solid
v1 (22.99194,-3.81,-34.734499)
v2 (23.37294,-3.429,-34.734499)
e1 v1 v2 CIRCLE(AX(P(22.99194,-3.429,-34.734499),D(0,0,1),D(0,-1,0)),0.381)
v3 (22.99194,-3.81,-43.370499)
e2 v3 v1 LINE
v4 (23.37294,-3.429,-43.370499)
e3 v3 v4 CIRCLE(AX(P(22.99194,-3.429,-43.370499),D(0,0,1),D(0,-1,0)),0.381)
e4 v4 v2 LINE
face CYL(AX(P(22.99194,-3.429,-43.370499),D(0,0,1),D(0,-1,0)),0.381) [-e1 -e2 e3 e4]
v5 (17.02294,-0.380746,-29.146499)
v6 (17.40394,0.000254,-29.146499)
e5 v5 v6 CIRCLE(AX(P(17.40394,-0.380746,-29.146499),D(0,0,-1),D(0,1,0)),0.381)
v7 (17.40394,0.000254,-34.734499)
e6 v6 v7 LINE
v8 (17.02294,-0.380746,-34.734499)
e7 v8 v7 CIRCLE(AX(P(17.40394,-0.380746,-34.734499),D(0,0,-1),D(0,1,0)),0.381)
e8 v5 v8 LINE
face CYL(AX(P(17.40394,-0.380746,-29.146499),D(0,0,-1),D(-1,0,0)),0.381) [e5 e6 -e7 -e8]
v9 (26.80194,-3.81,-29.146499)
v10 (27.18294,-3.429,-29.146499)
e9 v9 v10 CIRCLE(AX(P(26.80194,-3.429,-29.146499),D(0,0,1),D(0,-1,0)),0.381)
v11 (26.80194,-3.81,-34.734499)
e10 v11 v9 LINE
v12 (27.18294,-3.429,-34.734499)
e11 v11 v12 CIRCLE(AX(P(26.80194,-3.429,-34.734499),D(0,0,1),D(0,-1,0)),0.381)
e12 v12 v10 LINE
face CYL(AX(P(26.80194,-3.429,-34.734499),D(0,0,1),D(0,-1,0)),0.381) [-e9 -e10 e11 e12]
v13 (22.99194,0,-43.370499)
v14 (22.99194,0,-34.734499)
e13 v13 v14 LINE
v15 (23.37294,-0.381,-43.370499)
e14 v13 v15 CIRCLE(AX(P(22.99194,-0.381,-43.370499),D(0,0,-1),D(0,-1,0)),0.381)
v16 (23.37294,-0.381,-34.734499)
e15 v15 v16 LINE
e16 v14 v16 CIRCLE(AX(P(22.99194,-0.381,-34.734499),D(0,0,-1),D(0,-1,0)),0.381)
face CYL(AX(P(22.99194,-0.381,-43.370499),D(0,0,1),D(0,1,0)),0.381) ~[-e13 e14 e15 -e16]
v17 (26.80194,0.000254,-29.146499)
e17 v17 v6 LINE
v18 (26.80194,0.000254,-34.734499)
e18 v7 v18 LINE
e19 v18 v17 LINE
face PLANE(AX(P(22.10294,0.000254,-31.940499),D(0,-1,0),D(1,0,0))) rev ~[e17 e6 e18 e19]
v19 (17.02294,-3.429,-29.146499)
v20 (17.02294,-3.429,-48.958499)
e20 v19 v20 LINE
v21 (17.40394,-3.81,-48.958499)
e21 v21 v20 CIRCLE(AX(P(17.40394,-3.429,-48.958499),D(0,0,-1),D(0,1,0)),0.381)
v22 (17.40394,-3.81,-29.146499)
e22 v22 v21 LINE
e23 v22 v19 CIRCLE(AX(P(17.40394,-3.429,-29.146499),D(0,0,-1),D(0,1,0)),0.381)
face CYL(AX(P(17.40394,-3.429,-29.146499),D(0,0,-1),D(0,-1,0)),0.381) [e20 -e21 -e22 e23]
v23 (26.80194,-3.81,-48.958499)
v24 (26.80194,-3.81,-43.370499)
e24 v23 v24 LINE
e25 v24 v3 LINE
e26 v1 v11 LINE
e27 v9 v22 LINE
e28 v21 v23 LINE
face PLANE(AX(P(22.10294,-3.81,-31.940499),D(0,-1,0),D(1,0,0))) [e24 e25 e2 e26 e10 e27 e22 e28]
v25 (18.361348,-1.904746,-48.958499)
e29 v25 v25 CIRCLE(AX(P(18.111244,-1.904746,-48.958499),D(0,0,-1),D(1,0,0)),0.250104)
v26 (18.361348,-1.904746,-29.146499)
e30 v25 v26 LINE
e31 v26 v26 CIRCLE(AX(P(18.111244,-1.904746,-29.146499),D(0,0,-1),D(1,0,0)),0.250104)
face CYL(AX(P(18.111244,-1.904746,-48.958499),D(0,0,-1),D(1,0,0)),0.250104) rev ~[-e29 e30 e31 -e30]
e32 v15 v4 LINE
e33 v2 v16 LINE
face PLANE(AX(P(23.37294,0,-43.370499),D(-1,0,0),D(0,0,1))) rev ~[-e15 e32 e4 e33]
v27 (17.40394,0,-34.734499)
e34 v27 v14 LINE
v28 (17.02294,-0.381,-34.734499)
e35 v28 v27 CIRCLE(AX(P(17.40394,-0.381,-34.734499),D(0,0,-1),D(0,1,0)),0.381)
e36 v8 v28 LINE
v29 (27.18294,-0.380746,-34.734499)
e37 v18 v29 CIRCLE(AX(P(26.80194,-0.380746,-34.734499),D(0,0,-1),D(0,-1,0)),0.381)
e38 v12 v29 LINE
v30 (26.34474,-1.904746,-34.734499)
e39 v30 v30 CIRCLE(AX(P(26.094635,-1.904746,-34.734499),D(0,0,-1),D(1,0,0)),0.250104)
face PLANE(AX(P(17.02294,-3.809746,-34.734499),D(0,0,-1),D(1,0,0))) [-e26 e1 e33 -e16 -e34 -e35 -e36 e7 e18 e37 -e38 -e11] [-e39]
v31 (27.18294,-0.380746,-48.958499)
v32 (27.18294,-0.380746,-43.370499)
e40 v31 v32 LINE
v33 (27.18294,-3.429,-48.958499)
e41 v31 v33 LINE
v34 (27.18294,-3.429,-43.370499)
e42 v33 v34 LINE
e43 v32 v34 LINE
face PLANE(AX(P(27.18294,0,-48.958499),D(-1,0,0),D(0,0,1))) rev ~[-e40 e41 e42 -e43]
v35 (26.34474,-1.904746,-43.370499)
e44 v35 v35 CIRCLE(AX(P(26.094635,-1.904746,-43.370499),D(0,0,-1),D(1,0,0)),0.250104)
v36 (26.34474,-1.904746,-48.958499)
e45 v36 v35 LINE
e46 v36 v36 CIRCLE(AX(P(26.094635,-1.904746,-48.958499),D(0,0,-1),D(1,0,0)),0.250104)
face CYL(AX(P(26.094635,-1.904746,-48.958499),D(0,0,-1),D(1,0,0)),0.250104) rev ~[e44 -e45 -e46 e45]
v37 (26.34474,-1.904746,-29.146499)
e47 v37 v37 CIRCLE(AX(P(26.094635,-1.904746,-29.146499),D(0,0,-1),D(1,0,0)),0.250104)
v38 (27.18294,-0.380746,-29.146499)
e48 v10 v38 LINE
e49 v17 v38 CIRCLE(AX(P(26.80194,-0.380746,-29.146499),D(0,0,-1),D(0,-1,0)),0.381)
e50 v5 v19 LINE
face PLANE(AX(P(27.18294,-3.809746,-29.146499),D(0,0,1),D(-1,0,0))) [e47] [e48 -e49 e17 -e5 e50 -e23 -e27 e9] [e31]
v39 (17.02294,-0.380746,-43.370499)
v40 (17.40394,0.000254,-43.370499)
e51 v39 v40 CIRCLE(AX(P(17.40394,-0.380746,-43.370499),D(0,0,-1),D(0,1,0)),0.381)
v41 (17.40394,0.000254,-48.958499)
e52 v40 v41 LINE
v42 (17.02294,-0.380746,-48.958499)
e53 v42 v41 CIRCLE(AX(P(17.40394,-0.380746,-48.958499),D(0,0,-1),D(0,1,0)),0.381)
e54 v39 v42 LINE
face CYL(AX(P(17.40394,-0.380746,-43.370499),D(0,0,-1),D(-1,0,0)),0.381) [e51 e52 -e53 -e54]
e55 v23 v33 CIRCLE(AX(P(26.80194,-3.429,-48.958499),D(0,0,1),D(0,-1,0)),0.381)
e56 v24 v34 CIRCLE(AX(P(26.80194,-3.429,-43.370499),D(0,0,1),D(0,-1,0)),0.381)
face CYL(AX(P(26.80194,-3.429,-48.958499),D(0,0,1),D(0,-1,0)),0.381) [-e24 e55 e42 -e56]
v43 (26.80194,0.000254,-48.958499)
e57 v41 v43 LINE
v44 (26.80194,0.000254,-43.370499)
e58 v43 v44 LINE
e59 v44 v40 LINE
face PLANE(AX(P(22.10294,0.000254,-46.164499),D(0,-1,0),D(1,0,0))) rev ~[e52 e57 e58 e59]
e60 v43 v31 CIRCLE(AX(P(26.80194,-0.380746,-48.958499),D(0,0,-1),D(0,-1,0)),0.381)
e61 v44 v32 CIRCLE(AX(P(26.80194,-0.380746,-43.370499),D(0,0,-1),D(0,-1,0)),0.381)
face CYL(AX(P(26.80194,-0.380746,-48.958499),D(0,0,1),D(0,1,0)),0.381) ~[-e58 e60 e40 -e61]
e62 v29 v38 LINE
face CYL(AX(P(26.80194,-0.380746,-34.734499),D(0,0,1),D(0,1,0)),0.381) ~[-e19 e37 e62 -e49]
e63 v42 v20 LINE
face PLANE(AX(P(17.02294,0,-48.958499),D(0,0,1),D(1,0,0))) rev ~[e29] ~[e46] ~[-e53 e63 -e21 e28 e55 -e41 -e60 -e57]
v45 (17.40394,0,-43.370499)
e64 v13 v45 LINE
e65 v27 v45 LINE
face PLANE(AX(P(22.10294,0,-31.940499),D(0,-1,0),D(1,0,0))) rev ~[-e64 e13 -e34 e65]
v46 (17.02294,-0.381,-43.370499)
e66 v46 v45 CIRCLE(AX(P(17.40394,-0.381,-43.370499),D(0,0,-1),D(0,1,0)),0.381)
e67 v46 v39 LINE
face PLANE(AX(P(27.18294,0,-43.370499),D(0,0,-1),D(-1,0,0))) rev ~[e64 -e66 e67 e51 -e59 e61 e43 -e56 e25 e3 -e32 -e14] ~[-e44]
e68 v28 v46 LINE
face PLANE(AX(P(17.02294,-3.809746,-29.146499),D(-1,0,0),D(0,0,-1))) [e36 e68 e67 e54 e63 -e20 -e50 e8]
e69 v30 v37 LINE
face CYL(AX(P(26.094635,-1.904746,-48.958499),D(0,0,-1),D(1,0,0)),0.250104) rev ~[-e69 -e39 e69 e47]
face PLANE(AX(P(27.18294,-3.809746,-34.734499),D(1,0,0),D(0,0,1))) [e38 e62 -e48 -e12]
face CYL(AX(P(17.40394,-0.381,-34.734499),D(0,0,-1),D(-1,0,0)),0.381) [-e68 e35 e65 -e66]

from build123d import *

# Parameters (mm, degrees)
F0_W     = 6.35
F0_H     = 8.636
F1_DEPTH = 3.81
F3_START = -0.000254
F3_DEPTH = 3.81
F4_R     = 0.2501042953
F5_DEPTH = 50.8
F6_R     = 0.381


# Not quite as in the source:
# - a feature names something its author has since deleted; it is built from what else it names


with BuildPart() as f1:
    # F0 (on Front) → F1 (new body)
    with BuildSketch(Plane.XZ):
        Polygon((27.1829397243, -29.1464989846), (17.0229397243, -29.1464989846), (17.0229397243, -34.7344989846), (23.3729397243, -34.7344989846), (27.1829397243, -34.7344989846), align=None)
        with Locations((20.1979397243, -39.0524989846)):
            Rectangle(F0_W, F0_H)
        Polygon((23.3729397243, -43.3704989846), (17.0229397243, -43.3704989846), (17.0229397243, -48.9584989846), (23.3729397243, -48.9584989846), (27.1829397243, -48.9584989846), (27.1829397243, -43.3704989846), align=None)
    extrude(amount=F1_DEPTH)

    # F2 (on face) → F3 (join)
    with BuildSketch(Plane.XZ.offset(3.81).offset(F3_START)):
        Polygon((27.1829397243, -29.1464989846), (17.0229397243, -29.1464989846), (17.0229397243, -34.7344989846), (23.3729397243, -34.7344989846), (27.1829397243, -34.7344989846), align=None)
        Polygon((27.1829397243, -43.3704989846), (23.3729397243, -43.3704989846), (17.0229397243, -43.3704989846), (17.0229397243, -48.9584989846), (27.1829397243, -48.9584989846), align=None)
    extrude(amount=-F3_DEPTH)

    # F4 (on face) → F5 (cut)
    with BuildSketch(Plane(origin=(0, 0, -48.9584989846), x_dir=(1, 0, 0), z_dir=(0, 0, -1))):
        with Locations((26.094635429, 1.904746)):
            Circle(F4_R)
        with Locations((18.1112440196, 1.904746)):
            Circle(F4_R)
    extrude(amount=-F5_DEPTH, mode=Mode.SUBTRACT)

    # F6 (call 1 of 10: OpenCascade refuses the feature's edges together)
    f6_edges = [f1.edges().sort_by_distance(p)[0] for p in [
        (27.18294, -3.81, -31.940499),
    ]]
    fillet(f6_edges, radius=F6_R)

    # F6#2 (call 2 of 10)
    f6_2_edges = [f1.edges().sort_by_distance(p)[0] for p in [
        (17.02294, -3.81, -39.052499),
    ]]
    fillet(f6_2_edges, radius=F6_R)

    # F6#3 (call 3 of 10)
    f6_3_edges = [f1.edges().sort_by_distance(p)[0] for p in [
        (27.18294, -3.81, -46.164499),
    ]]
    fillet(f6_3_edges, radius=F6_R)

    # F6#4 (call 4 of 10)
    f6_4_edges = [f1.edges().sort_by_distance(p)[0] for p in [
        (23.37294, -3.81, -39.052499),
    ]]
    fillet(f6_4_edges, radius=F6_R)

    # F6#5 (call 5 of 10)
    f6_5_edges = [f1.edges().sort_by_distance(p)[0] for p in [
        (23.37294, 0, -39.052499),
    ]]
    fillet(f6_5_edges, radius=F6_R)

    # F6#7 (call 6 of 10)
    f6_7_edges = [f1.edges().sort_by_distance(p)[0] for p in [
        (27.18294, 0.000254, -31.940499),
    ]]
    fillet(f6_7_edges, radius=F6_R)

    # F6#8 (call 7 of 10)
    f6_8_edges = [f1.edges().sort_by_distance(p)[0] for p in [
        (27.18294, 0.000254, -46.164499),
    ]]
    fillet(f6_8_edges, radius=F6_R)

    # F6#10 (call 8 of 10)
    f6_10_edges = [f1.edges().sort_by_distance(p)[0] for p in [
        (17.02294, 0, -39.052499),
    ]]
    fillet(f6_10_edges, radius=F6_R)

    # F6#6 (call 9 of 10)
    f6_6_edges = [f1.edges().sort_by_distance(p)[0] for p in [
        (17.02294, 0.000254, -31.940499),
    ]]
    fillet(f6_6_edges, radius=F6_R)

    # F6#9 (call 10 of 10)
    f6_9_edges = [f1.edges().sort_by_distance(p)[0] for p in [
        (17.02294, 0.000254, -46.164499),
    ]]
    fillet(f6_9_edges, radius=F6_R)


solid = f1.part
